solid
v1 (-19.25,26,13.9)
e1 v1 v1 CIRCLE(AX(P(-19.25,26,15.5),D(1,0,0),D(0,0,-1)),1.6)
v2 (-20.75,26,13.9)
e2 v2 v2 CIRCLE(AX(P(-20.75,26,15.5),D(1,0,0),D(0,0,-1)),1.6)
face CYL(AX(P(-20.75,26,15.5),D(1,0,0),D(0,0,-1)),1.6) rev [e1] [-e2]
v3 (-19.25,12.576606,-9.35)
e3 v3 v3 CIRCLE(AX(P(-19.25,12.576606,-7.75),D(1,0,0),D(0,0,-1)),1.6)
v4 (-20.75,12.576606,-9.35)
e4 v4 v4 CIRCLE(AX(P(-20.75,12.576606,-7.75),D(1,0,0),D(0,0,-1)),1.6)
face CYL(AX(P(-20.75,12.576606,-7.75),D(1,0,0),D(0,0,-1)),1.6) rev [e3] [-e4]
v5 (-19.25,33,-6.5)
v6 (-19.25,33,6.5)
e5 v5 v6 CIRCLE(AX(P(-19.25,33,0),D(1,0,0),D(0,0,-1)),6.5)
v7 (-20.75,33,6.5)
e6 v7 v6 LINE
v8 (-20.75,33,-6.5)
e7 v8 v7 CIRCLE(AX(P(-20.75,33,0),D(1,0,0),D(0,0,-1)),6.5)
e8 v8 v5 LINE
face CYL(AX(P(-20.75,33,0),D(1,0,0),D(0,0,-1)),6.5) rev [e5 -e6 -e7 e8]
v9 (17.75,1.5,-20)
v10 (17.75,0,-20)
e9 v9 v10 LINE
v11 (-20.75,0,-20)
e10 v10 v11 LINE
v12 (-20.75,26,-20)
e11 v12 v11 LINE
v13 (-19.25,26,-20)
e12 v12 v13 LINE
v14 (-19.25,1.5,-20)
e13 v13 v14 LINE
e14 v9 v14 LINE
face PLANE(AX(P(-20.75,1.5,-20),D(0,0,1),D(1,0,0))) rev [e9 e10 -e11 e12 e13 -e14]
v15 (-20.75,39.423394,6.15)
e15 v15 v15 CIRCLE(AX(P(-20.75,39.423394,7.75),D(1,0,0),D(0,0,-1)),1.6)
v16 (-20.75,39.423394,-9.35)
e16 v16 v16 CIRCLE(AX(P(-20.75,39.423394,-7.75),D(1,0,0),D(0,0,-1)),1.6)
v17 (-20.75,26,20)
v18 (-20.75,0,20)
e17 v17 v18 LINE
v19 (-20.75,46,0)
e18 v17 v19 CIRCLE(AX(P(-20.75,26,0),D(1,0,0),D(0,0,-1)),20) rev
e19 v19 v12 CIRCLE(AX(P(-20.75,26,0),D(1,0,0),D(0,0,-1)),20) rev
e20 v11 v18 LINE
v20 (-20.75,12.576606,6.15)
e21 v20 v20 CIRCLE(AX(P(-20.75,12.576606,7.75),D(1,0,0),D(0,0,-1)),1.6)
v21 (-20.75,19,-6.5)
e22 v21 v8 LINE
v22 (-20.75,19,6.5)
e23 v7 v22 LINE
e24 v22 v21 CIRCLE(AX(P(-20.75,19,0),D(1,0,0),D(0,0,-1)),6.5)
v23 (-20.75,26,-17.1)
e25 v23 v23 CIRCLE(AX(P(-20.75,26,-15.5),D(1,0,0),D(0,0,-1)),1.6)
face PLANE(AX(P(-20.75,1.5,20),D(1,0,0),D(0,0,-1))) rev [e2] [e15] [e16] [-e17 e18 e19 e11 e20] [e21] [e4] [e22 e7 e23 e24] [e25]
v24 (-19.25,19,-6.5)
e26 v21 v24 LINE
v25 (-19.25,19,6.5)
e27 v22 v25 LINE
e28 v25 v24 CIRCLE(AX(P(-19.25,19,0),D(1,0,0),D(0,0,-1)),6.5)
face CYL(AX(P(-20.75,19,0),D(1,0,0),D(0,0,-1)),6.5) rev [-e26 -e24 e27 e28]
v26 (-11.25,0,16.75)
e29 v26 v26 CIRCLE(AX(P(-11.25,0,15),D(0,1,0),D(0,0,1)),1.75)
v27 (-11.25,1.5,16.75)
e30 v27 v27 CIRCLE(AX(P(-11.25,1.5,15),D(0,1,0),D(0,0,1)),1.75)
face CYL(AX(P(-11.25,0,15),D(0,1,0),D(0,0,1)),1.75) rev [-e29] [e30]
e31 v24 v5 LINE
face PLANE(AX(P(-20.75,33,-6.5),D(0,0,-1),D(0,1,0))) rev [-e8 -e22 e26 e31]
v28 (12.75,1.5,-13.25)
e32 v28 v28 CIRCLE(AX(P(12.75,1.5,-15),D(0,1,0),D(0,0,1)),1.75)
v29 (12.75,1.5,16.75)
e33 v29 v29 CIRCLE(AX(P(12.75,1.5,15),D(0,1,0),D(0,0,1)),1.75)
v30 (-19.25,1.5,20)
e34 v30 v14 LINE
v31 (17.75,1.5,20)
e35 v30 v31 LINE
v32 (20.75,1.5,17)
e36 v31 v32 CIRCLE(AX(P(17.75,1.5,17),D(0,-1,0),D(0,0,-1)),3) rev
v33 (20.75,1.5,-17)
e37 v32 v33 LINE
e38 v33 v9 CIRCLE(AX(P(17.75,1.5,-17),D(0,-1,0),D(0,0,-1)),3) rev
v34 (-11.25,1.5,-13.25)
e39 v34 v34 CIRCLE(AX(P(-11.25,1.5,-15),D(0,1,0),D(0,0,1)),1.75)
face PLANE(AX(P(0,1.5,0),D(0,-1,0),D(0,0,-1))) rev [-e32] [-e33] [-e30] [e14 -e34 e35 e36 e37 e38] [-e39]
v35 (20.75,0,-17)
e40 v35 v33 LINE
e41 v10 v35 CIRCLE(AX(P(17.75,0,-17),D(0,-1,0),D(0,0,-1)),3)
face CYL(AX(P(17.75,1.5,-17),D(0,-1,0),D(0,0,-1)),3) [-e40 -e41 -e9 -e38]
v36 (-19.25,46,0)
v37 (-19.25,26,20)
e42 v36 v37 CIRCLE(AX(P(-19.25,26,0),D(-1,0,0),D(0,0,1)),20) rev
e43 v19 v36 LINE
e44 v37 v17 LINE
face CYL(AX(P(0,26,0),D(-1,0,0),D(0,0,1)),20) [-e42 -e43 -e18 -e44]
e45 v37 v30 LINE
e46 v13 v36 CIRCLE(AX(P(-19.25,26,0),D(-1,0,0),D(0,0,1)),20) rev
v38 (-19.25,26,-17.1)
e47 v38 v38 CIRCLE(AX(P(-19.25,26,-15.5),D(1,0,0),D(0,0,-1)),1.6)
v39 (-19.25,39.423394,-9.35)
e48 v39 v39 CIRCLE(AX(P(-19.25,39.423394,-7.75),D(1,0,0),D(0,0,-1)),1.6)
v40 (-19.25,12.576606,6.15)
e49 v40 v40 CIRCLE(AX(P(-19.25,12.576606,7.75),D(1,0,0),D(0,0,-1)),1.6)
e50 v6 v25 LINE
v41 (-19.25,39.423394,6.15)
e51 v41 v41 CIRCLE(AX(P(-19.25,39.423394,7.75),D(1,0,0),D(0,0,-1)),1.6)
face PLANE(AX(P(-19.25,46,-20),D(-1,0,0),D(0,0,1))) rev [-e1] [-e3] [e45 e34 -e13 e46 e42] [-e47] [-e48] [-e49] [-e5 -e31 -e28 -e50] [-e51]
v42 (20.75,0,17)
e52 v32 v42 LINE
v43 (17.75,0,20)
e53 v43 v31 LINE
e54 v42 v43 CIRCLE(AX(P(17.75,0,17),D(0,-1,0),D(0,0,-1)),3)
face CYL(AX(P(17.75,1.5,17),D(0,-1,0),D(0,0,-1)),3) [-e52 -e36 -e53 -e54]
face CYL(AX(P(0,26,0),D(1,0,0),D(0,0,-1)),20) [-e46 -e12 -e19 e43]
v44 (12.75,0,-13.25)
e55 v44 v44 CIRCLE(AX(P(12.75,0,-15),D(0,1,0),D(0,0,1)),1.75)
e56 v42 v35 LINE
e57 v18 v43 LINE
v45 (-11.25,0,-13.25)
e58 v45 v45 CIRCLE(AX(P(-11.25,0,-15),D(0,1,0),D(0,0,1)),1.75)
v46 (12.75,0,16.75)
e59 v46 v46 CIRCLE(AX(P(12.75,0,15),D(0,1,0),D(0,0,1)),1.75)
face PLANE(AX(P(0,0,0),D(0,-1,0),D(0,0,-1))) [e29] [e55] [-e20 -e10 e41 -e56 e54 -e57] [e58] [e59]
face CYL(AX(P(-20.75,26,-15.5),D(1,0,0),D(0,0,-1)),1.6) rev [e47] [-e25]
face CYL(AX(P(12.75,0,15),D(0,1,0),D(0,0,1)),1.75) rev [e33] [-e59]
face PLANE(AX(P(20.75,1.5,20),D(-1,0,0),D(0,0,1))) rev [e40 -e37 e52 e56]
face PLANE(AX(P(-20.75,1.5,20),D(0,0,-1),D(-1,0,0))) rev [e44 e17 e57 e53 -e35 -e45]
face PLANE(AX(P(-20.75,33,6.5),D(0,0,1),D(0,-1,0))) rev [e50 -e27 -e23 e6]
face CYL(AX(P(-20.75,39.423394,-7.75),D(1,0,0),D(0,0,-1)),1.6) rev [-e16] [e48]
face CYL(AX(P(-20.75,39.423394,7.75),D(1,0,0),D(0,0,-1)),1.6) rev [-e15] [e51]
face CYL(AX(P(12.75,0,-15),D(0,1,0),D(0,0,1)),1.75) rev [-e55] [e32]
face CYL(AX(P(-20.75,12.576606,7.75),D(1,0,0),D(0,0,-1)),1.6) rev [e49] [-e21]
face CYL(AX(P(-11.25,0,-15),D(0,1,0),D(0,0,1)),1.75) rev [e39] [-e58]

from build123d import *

# Parameters (mm, degrees)
SKETCH_3_W          = 41.5
SKETCH_3_H          = 40
EXTRUDE_1_DEPTH     = 1.5
SKETCH_4_W          = 1.5
SKETCH_4_H          = 40
EXTRUDE_2_DEPTH     = 44.5
SKETCH_5_R          = 1.75
CUT_EXTRUDE_1_DEPTH = 1.5
SKETCH_6_R          = 1.6
CUT_EXTRUDE_2_DEPTH = 1.5
FILLET_3_R          = 20
FILLET_4_R          = 3


with BuildPart() as part:
    # 草图3 → 凸台-拉伸1 (new body)
    with BuildSketch(Plane(origin=(0, 0, 0), x_dir=(1, 0, 0), z_dir=(0, 1, 0))):
        Rectangle(SKETCH_3_W, SKETCH_3_H)
    extrude(amount=EXTRUDE_1_DEPTH)

    # 草图4 → 凸台-拉伸2 (add)
    with BuildSketch(Plane(origin=(0, 1.5, 0), x_dir=(1, 0, 0), z_dir=(0, 1, 0))):
        with Locations((-20, 0)):
            Rectangle(SKETCH_4_W, SKETCH_4_H)
    extrude(amount=EXTRUDE_2_DEPTH)

    # 草图5 → 切除-拉伸1 (cut)
    with BuildSketch(Plane(origin=(0, 1.5, 0), x_dir=(1, 0, 0), z_dir=(0, 1, 0))):
        with Locations(Location((-11.25, 15, 0), (0, 0, 270))):
            Circle(SKETCH_5_R)
        with Locations(Location((12.75, 15, 0), (0, 0, 270))):
            Circle(SKETCH_5_R)
        with Locations(Location((-11.25, -15, 0), (0, 0, 270))):
            Circle(SKETCH_5_R)
        with Locations(Location((12.75, -15, 0), (0, 0, 270))):
            Circle(SKETCH_5_R)
    extrude(amount=-CUT_EXTRUDE_1_DEPTH, mode=Mode.SUBTRACT)

    # 草图6 → 切除-拉伸2 (cut)
    with BuildSketch(Plane(origin=(-19.25, 0, 0), x_dir=(0, 0, -1), z_dir=(1, 0, 0))):
        with Locations((-15.5, 26)):
            Circle(SKETCH_6_R)
        with Locations((-7.75, 39.423393759)):
            Circle(SKETCH_6_R)
        with Locations((7.75, 39.423393759)):
            Circle(SKETCH_6_R)
        with Locations((15.5, 26)):
            Circle(SKETCH_6_R)
        with Locations((7.75, 12.576606241)):
            Circle(SKETCH_6_R)
        with Locations((-7.75, 12.576606241)):
            Circle(SKETCH_6_R)
        with BuildLine():
            Line((-6.5, 33), (-6.5, 19))
            ThreePointArc((-6.5, 19), (0, 12.5), (6.5, 19))
            Line((6.5, 19), (6.5, 33))
            ThreePointArc((6.5, 33), (0, 39.5), (-6.5, 33))
        make_face()
    extrude(amount=-CUT_EXTRUDE_2_DEPTH, mode=Mode.SUBTRACT)

    # 圆角3
    fillet_3_edges = [part.edges().sort_by_distance(p)[0] for p in [
        (-20, 46, -20),
        (-20, 46, 20),
    ]]
    fillet(fillet_3_edges, radius=FILLET_3_R - 0.0001)  # a hair under: the kernel refuses the full size

    # 圆角4
    fillet_4_edges = [part.edges().sort_by_distance(p)[0] for p in [
        (20.75, 0.75, 20),
        (20.75, 0.75, -20),
    ]]
    fillet(fillet_4_edges, radius=FILLET_4_R)


solid = part.part
